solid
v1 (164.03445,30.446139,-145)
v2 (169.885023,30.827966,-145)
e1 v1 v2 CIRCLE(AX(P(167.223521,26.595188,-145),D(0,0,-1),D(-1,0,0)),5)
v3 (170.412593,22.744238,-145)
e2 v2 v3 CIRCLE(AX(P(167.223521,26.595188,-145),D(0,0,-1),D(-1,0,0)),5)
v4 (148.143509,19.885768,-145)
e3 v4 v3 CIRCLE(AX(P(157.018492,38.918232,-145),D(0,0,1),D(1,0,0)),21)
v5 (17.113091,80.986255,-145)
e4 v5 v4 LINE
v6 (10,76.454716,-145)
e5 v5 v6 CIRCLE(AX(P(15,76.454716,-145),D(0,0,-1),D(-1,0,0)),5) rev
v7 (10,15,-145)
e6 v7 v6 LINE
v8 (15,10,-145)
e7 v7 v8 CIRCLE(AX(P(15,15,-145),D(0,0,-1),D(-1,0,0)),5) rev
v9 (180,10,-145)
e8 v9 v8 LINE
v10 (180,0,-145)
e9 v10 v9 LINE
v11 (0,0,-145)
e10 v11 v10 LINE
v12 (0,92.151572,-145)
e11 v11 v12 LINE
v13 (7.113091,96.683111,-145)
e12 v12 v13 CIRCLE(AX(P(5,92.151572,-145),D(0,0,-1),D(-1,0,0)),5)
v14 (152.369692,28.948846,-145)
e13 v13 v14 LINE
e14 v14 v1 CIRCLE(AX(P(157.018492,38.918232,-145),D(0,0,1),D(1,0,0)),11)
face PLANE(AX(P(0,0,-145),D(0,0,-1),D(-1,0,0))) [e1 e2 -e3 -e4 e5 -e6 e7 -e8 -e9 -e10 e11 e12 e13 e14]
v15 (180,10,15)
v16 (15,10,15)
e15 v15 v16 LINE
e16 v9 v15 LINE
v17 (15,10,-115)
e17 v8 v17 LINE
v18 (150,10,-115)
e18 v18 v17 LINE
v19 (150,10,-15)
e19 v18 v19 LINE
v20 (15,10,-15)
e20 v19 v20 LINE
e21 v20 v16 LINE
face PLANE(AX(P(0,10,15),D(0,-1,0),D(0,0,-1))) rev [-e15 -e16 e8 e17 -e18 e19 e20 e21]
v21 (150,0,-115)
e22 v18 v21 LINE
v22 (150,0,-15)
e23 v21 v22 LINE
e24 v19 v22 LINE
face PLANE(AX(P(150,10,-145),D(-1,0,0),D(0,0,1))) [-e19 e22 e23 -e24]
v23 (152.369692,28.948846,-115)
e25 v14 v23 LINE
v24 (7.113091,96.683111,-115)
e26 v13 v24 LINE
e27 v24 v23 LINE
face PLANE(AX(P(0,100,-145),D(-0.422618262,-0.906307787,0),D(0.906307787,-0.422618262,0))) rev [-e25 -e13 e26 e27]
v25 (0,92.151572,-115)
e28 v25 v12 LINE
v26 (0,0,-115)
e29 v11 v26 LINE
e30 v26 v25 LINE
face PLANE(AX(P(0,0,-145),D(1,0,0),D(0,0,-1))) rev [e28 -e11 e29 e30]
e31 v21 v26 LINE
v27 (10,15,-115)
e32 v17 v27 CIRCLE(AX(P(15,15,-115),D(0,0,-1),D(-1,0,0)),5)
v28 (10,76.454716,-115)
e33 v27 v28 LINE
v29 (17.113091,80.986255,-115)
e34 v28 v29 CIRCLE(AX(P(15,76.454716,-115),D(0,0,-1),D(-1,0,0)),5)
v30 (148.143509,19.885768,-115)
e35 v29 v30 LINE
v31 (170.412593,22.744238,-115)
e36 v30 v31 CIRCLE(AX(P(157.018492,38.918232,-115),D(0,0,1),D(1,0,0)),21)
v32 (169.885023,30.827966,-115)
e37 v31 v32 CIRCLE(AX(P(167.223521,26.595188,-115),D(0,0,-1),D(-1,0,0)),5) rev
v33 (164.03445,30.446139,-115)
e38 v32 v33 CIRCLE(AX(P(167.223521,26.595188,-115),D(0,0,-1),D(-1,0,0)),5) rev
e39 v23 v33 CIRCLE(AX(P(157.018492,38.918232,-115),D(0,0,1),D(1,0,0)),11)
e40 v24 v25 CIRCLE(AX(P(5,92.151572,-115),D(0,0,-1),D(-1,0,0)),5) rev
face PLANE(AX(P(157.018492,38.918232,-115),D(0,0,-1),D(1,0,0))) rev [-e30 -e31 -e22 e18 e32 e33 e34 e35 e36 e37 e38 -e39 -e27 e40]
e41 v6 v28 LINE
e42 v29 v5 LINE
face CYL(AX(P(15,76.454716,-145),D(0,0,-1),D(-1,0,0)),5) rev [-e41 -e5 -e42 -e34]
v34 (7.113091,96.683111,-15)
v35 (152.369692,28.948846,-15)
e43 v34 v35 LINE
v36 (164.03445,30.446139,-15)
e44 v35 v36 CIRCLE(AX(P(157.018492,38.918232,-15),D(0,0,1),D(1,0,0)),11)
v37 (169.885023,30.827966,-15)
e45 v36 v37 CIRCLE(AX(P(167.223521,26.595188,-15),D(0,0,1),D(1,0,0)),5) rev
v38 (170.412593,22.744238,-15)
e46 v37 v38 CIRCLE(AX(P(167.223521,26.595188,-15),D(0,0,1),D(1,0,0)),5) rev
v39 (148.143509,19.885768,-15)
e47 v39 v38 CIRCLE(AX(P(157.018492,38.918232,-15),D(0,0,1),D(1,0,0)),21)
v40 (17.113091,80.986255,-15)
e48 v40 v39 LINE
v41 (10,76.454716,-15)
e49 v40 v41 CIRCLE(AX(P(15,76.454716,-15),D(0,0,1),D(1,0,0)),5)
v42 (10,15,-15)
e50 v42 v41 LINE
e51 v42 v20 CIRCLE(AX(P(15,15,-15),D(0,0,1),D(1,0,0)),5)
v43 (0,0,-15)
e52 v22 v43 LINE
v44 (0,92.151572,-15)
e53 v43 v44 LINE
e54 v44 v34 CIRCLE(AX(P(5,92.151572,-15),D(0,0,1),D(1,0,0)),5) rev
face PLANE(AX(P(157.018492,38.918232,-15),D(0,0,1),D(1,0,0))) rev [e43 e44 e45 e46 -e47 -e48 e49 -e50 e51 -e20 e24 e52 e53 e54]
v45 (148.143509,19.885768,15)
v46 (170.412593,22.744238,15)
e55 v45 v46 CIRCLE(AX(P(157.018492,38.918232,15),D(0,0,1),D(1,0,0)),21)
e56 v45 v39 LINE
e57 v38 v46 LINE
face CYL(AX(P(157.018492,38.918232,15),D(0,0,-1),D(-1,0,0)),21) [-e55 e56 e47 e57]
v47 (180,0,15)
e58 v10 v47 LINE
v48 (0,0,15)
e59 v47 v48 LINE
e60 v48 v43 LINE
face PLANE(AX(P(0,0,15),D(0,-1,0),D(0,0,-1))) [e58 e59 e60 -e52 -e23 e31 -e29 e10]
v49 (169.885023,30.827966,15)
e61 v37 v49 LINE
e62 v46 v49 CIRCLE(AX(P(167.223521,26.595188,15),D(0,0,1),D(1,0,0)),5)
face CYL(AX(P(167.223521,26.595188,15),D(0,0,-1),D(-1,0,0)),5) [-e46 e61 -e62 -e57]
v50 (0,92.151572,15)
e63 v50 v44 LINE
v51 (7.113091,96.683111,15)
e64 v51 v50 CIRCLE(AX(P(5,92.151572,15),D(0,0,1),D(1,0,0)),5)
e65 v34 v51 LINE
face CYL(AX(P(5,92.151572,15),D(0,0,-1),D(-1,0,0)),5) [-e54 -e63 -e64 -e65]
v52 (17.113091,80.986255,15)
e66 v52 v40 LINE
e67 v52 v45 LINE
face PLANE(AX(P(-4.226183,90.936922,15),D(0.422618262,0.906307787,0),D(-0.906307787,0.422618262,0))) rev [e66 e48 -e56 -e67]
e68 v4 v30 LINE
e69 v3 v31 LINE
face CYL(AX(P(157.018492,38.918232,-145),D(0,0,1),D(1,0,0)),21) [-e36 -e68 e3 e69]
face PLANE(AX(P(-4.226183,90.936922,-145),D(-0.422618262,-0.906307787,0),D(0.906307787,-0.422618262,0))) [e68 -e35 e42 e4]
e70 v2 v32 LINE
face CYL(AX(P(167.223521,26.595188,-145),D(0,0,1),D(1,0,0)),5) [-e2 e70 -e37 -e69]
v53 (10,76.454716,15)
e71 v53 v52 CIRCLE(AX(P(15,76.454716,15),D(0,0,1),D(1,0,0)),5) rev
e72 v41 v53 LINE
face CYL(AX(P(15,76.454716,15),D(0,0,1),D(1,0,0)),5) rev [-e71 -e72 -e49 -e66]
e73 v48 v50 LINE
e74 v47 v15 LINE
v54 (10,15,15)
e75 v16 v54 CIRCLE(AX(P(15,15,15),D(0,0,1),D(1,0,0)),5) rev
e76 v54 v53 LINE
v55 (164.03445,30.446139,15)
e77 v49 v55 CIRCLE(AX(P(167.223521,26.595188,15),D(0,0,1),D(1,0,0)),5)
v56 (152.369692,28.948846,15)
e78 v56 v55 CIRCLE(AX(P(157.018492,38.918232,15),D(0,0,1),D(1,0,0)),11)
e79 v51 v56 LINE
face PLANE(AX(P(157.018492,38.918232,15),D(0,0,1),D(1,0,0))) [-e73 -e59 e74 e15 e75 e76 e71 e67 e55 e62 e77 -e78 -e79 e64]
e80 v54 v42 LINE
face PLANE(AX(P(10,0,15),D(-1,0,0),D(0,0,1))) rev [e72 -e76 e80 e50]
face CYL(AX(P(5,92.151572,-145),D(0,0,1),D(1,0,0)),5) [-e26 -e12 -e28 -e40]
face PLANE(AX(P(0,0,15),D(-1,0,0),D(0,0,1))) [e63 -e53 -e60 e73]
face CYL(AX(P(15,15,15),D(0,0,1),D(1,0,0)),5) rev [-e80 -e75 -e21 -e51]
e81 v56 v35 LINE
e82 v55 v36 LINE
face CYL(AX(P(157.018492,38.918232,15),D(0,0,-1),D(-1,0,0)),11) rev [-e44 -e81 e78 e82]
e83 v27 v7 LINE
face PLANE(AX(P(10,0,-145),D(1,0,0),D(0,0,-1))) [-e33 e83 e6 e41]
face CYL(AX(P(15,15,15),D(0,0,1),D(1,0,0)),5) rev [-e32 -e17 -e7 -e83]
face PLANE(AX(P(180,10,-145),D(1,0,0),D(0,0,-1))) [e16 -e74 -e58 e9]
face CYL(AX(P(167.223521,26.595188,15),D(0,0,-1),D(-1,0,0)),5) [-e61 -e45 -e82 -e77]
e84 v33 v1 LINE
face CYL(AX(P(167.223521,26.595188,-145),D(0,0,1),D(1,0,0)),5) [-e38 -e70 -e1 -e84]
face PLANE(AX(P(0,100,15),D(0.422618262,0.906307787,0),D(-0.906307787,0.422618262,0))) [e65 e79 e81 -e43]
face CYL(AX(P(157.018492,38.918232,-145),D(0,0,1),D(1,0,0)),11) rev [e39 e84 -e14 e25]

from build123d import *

# Parameters (mm, degrees)
EXTRUDE_THIN1_DEPTH = 15
SKETCH5_W           = 30
SKETCH5_H           = 10
BOSS_EXTRUDE2_DEPTH = 160
FILLET15_R          = 5


with BuildPart() as part:
    # Sketch2 → Extrude-Thin1 (new, symmetric)
    with BuildSketch(Plane.XY):
        with BuildLine():
            ThreePointArc((166.330603598, 33.062927418), (160.12783844, 28.366835098), (152.36969162, 28.948845927))
            Line((152.36969162, 28.948845927), (0, 100))
            Line((0, 100), (0, 0))
            Line((0, 0), (150, 0))
            Line((150, 0), (150, 10))
            Line((150, 10), (10, 10))
            Line((10, 10), (10, 84.303144229))
            Line((10, 84.303144229), (148.143509003, 19.885768057))
            ThreePointArc((148.143509003, 19.885768057), (162.954516568, 18.774656473), (174.796159143, 27.73992363))
            Line((174.796159143, 27.73992363), (166.330603598, 33.062927418))
        make_face()
    extrude_thin1 = extrude(amount=EXTRUDE_THIN1_DEPTH, both=True)

    # Sketch5 → Boss-Extrude2 (add)
    with BuildSketch(Plane.XY.offset(15)):
        with Locations((165, 5)):
            Rectangle(SKETCH5_W, SKETCH5_H)
    extrude(amount=-BOSS_EXTRUDE2_DEPTH)

    # Mirror1: Extrude-Thin1 across plane
    add(extrude_thin1.mirror(Plane.XY.offset(-65)))

    # Fillet15
    fillet15_edges = [part.edges().sort_by_distance(p)[0] for p in [
        (0, 100, 0),
        (0, 100, -130),
        (174.796159143, 27.73992363, -130),
        (166.330603598, 33.062927418, -130),
        (10, 10, -130),
        (10, 84.303144229, -130),
        (10, 84.303144229, 0),
        (10, 10, 0),
        (174.796159143, 27.73992363, 0),
        (166.330603598, 33.062927418, 0),
    ]]
    fillet(fillet15_edges, radius=FILLET15_R - 0.0001)  # a hair under: the kernel refuses the full size


solid = part.part
